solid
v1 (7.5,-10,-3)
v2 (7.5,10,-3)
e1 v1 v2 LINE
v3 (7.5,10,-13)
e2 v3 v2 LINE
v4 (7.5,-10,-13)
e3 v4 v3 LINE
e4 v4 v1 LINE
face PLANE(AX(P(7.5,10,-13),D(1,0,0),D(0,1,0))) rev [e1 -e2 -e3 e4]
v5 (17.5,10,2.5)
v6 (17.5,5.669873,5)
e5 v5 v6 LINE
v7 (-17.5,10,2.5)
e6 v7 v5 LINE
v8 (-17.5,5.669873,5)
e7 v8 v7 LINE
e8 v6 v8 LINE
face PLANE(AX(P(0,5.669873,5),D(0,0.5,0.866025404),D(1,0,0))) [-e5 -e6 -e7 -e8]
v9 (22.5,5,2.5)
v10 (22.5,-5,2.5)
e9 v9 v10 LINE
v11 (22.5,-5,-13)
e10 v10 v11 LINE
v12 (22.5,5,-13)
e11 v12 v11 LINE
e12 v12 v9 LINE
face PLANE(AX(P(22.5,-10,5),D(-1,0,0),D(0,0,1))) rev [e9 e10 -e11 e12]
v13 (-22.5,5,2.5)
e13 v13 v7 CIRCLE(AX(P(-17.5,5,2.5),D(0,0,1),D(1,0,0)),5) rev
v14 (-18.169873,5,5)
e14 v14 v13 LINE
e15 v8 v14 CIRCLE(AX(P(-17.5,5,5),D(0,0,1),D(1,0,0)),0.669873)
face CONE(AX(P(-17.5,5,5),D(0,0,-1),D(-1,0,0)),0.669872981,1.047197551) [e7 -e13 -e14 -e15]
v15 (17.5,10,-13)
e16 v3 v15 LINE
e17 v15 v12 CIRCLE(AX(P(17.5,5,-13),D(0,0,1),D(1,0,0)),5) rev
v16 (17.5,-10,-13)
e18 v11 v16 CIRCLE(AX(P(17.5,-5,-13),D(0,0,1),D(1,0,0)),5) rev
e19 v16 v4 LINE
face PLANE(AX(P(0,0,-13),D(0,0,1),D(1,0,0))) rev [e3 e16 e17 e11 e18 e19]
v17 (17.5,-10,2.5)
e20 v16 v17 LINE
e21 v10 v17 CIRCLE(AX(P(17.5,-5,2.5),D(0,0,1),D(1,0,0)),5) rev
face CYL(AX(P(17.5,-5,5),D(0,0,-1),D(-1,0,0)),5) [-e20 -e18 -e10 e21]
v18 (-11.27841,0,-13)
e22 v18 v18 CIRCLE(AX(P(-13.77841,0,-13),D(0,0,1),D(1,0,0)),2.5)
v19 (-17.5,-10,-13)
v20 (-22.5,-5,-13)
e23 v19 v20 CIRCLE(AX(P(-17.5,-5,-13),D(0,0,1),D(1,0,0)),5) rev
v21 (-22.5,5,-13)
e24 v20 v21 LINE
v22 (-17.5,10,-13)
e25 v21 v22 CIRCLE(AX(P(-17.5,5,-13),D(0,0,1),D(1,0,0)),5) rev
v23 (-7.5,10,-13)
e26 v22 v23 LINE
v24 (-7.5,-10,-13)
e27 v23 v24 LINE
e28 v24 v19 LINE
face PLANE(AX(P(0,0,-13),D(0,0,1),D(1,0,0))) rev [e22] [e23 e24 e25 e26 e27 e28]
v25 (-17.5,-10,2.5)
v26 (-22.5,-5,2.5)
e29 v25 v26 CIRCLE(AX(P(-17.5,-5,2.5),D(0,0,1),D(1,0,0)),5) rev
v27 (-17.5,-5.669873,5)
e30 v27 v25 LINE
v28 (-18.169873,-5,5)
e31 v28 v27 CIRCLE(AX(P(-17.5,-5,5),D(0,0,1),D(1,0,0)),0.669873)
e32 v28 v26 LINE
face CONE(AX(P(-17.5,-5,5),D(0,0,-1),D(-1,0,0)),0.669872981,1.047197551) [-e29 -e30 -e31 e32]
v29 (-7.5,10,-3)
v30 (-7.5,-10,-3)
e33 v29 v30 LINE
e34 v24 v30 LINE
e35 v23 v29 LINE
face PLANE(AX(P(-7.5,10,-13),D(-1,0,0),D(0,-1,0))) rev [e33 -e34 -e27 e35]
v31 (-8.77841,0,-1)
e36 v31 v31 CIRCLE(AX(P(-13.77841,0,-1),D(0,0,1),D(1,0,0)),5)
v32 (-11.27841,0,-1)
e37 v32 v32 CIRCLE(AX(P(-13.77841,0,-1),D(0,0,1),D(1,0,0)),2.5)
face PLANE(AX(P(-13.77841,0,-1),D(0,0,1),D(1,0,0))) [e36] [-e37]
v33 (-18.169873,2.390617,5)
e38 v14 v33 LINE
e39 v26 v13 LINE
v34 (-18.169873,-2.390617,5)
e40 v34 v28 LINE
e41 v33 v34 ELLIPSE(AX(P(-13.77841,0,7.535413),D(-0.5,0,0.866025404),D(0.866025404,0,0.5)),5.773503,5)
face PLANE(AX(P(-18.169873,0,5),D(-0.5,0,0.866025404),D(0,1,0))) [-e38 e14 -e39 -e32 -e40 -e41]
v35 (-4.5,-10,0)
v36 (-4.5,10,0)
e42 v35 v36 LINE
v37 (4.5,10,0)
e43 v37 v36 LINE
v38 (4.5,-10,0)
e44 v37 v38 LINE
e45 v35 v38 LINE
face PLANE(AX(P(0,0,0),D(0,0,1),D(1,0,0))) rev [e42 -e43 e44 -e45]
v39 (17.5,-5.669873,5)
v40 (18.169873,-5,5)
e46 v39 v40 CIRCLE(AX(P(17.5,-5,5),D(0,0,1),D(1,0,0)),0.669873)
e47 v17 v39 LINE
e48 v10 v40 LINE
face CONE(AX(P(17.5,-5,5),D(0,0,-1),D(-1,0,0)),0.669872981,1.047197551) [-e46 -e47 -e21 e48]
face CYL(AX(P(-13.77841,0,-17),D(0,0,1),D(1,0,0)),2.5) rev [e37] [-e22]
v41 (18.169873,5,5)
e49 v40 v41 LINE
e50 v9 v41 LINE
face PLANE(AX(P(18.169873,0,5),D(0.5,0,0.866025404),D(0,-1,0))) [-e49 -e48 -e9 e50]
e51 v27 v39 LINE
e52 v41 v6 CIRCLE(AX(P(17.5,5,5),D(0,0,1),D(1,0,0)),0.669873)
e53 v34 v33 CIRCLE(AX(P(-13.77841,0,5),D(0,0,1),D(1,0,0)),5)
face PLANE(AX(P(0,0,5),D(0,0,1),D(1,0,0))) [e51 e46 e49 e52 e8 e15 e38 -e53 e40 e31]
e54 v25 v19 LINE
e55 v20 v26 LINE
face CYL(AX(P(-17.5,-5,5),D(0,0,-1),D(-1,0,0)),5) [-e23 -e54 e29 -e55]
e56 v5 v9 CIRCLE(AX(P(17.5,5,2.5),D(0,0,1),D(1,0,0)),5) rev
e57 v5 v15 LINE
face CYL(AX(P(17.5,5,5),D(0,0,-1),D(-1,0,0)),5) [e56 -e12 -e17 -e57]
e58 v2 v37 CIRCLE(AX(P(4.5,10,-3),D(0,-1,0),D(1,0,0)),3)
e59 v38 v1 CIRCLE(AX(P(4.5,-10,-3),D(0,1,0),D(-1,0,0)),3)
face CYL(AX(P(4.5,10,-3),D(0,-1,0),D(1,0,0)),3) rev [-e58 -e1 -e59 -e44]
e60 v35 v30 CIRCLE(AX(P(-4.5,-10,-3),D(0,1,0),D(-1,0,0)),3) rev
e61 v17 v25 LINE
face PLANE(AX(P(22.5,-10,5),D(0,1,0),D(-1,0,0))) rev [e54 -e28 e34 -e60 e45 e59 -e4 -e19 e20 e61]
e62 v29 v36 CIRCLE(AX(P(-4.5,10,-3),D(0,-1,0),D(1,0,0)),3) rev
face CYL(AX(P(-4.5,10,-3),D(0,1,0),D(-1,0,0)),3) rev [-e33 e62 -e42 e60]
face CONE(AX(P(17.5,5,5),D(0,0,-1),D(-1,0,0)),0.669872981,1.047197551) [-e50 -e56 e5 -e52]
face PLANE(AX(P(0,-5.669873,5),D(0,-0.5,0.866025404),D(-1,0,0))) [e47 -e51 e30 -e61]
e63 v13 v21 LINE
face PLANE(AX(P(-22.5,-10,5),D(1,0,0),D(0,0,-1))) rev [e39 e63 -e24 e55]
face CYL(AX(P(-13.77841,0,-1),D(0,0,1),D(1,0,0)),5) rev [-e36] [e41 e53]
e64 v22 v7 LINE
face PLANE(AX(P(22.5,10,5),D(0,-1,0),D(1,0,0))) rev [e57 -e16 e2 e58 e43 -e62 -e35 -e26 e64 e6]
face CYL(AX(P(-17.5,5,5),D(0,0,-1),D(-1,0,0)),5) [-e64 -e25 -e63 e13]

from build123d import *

# Parameters (mm, degrees)
SKETCH1_W       = 45
SKETCH1_H       = 20
EXTRUDE1_DEPTH  = 5
SKETCH2_W       = 15
SKETCH2_H       = 20
EXTRUDE2_DEPTH  = 13
SKETCH3_R       = 5
EXTRUDE3_DEPTH  = 6
SKETCH4_R       = 2.5
EXTRUDE4_DEPTH  = 16
FILLET1_R       = 5
CHAMFER1_SIZE   = 4.330127019
CHAMFER1_SIZE_2 = 2.5
FILLET2_R       = 3
FILLET3_R       = 3


with BuildPart() as part:
    # Sketch1 → Extrude1 (new body)
    with BuildSketch(Plane.XY):
        Rectangle(SKETCH1_W, SKETCH1_H)
    extrude(amount=EXTRUDE1_DEPTH)

    # Sketch2 → Extrude2 (add)
    with BuildSketch(Plane(origin=(0, 0, 0), x_dir=(-1, 0, 0), z_dir=(0, 0, -1))):
        with Locations((15, 0)):
            Rectangle(SKETCH2_W, SKETCH2_H)
        with Locations((-15, 0)):
            Rectangle(SKETCH2_W, SKETCH2_H)
    extrude(amount=EXTRUDE2_DEPTH)

    # Sketch3 → Extrude3 (cut)
    with BuildSketch(Plane.XY.offset(5)):
        with Locations((-13.77840955, 0)):
            Circle(SKETCH3_R)
    extrude(amount=-EXTRUDE3_DEPTH, mode=Mode.SUBTRACT)

    # Sketch4 → Extrude4 (cut)
    with BuildSketch(Plane.XY.offset(-1)):
        with Locations((-13.77840955, 0)):
            Circle(SKETCH4_R)
    extrude(amount=-EXTRUDE4_DEPTH, mode=Mode.SUBTRACT)

    # Fillet1
    fillet1_edges = [part.edges().sort_by_distance(p)[0] for p in [
        (-22.5, 10, -4),
        (22.5, 10, -4),
        (22.5, -10, -4),
        (-22.5, -10, -4),
    ]]
    fillet(fillet1_edges, radius=FILLET1_R)

    # Chamfer1
    # the kernel refuses this chamfer: 4.330127019, 2.5 mm, written as the material it takes off along each edge
    with BuildSketch(Plane(origin=(22.5, 5, 5), x_dir=(-0.999813220622208, 0, 0.01932676561270069), z_dir=(0, -1, 0)), Plane(origin=(-22.5, -5, 5), x_dir=(0.999813220622208, 0, 0.01932676561270069), z_dir=(0, 1, 0))) as chamfer1_piece_1:
        Polygon((CHAMFER1_SIZE * 0.999813220604, CHAMFER1_SIZE * 0.0193267656124), (-CHAMFER1_SIZE_2 * 0.0193267656127, CHAMFER1_SIZE_2 * 0.999813220622), (0, 0), align=None)
    extrude(amount=10, mode=Mode.SUBTRACT)
    with BuildSketch(Plane(origin=(17.5, -10, 5), x_dir=(0, -0.05789386240267114, -0.9983227437537926), z_dir=(-1, 0, 0))) as chamfer1_piece_2:
        Polygon((CHAMFER1_SIZE_2 * 0.998322743754, -CHAMFER1_SIZE_2 * 0.0578938624027), (-CHAMFER1_SIZE * 0.0578938624016, -CHAMFER1_SIZE * 0.998322743736), (0, 0), align=None)
    extrude(amount=35, mode=Mode.SUBTRACT)
    with BuildSketch(Plane(origin=(-17.5, 10, 5), x_dir=(0, -0.999813220622208, 0.01932676561270069), z_dir=(1, 0, 0))) as chamfer1_piece_3:
        Polygon((CHAMFER1_SIZE * 0.999813220604, CHAMFER1_SIZE * 0.0193267656124), (-CHAMFER1_SIZE_2 * 0.0193267656127, CHAMFER1_SIZE_2 * 0.999813220622), (0, 0), align=None)
    extrude(amount=35, mode=Mode.SUBTRACT)
    with BuildSketch(Plane(origin=(-17.5, 5, 5), x_dir=(-1, 0, 0), z_dir=(0, -1, 0))) as chamfer1_piece_4:
        Polygon((5 - CHAMFER1_SIZE, 0), (5, CHAMFER1_SIZE_2), (5, 0), align=None)
    revolve(axis=Axis((-17.5, 5, 5), (0, 0, -1)), revolution_arc=90, mode=Mode.SUBTRACT)
    with BuildSketch(Plane(origin=(-17.5, -5, 5), x_dir=(0, -1, 0), z_dir=(1, 0, 0))) as chamfer1_piece_5:
        Polygon((5 - CHAMFER1_SIZE, 0), (5, CHAMFER1_SIZE_2), (5, 0), align=None)
    revolve(axis=Axis((-17.5, -5, 5), (0, 0, -1)), revolution_arc=90, mode=Mode.SUBTRACT)
    with BuildSketch(Plane(origin=(17.5, 5, 5), x_dir=(1, 0, 0), z_dir=(0, -1, 0))) as chamfer1_piece_6:
        Polygon((5 - CHAMFER1_SIZE, 0), (5, -CHAMFER1_SIZE_2), (5, 0), align=None)
    revolve(axis=Axis((17.5, 5, 5), (0, 0, 1)), revolution_arc=90, mode=Mode.SUBTRACT)
    with BuildSketch(Plane(origin=(17.5, -5, 5), x_dir=(0, -1, 0), z_dir=(-1, 0, 0))) as chamfer1_piece_7:
        Polygon((5 - CHAMFER1_SIZE, 0), (5, -CHAMFER1_SIZE_2), (5, 0), align=None)
    revolve(axis=Axis((17.5, -5, 5), (0, 0, 1)), revolution_arc=90, mode=Mode.SUBTRACT)

    # Fillet2
    fillet2_edges = [part.edges().sort_by_distance(p)[0] for p in [
        (-7.5, 0, 0),
    ]]
    fillet(fillet2_edges, radius=FILLET2_R)

    # Fillet3
    fillet3_edges = [part.edges().sort_by_distance(p)[0] for p in [
        (7.5, 0, 0),
    ]]
    fillet(fillet3_edges, radius=FILLET3_R)


solid = part.part
